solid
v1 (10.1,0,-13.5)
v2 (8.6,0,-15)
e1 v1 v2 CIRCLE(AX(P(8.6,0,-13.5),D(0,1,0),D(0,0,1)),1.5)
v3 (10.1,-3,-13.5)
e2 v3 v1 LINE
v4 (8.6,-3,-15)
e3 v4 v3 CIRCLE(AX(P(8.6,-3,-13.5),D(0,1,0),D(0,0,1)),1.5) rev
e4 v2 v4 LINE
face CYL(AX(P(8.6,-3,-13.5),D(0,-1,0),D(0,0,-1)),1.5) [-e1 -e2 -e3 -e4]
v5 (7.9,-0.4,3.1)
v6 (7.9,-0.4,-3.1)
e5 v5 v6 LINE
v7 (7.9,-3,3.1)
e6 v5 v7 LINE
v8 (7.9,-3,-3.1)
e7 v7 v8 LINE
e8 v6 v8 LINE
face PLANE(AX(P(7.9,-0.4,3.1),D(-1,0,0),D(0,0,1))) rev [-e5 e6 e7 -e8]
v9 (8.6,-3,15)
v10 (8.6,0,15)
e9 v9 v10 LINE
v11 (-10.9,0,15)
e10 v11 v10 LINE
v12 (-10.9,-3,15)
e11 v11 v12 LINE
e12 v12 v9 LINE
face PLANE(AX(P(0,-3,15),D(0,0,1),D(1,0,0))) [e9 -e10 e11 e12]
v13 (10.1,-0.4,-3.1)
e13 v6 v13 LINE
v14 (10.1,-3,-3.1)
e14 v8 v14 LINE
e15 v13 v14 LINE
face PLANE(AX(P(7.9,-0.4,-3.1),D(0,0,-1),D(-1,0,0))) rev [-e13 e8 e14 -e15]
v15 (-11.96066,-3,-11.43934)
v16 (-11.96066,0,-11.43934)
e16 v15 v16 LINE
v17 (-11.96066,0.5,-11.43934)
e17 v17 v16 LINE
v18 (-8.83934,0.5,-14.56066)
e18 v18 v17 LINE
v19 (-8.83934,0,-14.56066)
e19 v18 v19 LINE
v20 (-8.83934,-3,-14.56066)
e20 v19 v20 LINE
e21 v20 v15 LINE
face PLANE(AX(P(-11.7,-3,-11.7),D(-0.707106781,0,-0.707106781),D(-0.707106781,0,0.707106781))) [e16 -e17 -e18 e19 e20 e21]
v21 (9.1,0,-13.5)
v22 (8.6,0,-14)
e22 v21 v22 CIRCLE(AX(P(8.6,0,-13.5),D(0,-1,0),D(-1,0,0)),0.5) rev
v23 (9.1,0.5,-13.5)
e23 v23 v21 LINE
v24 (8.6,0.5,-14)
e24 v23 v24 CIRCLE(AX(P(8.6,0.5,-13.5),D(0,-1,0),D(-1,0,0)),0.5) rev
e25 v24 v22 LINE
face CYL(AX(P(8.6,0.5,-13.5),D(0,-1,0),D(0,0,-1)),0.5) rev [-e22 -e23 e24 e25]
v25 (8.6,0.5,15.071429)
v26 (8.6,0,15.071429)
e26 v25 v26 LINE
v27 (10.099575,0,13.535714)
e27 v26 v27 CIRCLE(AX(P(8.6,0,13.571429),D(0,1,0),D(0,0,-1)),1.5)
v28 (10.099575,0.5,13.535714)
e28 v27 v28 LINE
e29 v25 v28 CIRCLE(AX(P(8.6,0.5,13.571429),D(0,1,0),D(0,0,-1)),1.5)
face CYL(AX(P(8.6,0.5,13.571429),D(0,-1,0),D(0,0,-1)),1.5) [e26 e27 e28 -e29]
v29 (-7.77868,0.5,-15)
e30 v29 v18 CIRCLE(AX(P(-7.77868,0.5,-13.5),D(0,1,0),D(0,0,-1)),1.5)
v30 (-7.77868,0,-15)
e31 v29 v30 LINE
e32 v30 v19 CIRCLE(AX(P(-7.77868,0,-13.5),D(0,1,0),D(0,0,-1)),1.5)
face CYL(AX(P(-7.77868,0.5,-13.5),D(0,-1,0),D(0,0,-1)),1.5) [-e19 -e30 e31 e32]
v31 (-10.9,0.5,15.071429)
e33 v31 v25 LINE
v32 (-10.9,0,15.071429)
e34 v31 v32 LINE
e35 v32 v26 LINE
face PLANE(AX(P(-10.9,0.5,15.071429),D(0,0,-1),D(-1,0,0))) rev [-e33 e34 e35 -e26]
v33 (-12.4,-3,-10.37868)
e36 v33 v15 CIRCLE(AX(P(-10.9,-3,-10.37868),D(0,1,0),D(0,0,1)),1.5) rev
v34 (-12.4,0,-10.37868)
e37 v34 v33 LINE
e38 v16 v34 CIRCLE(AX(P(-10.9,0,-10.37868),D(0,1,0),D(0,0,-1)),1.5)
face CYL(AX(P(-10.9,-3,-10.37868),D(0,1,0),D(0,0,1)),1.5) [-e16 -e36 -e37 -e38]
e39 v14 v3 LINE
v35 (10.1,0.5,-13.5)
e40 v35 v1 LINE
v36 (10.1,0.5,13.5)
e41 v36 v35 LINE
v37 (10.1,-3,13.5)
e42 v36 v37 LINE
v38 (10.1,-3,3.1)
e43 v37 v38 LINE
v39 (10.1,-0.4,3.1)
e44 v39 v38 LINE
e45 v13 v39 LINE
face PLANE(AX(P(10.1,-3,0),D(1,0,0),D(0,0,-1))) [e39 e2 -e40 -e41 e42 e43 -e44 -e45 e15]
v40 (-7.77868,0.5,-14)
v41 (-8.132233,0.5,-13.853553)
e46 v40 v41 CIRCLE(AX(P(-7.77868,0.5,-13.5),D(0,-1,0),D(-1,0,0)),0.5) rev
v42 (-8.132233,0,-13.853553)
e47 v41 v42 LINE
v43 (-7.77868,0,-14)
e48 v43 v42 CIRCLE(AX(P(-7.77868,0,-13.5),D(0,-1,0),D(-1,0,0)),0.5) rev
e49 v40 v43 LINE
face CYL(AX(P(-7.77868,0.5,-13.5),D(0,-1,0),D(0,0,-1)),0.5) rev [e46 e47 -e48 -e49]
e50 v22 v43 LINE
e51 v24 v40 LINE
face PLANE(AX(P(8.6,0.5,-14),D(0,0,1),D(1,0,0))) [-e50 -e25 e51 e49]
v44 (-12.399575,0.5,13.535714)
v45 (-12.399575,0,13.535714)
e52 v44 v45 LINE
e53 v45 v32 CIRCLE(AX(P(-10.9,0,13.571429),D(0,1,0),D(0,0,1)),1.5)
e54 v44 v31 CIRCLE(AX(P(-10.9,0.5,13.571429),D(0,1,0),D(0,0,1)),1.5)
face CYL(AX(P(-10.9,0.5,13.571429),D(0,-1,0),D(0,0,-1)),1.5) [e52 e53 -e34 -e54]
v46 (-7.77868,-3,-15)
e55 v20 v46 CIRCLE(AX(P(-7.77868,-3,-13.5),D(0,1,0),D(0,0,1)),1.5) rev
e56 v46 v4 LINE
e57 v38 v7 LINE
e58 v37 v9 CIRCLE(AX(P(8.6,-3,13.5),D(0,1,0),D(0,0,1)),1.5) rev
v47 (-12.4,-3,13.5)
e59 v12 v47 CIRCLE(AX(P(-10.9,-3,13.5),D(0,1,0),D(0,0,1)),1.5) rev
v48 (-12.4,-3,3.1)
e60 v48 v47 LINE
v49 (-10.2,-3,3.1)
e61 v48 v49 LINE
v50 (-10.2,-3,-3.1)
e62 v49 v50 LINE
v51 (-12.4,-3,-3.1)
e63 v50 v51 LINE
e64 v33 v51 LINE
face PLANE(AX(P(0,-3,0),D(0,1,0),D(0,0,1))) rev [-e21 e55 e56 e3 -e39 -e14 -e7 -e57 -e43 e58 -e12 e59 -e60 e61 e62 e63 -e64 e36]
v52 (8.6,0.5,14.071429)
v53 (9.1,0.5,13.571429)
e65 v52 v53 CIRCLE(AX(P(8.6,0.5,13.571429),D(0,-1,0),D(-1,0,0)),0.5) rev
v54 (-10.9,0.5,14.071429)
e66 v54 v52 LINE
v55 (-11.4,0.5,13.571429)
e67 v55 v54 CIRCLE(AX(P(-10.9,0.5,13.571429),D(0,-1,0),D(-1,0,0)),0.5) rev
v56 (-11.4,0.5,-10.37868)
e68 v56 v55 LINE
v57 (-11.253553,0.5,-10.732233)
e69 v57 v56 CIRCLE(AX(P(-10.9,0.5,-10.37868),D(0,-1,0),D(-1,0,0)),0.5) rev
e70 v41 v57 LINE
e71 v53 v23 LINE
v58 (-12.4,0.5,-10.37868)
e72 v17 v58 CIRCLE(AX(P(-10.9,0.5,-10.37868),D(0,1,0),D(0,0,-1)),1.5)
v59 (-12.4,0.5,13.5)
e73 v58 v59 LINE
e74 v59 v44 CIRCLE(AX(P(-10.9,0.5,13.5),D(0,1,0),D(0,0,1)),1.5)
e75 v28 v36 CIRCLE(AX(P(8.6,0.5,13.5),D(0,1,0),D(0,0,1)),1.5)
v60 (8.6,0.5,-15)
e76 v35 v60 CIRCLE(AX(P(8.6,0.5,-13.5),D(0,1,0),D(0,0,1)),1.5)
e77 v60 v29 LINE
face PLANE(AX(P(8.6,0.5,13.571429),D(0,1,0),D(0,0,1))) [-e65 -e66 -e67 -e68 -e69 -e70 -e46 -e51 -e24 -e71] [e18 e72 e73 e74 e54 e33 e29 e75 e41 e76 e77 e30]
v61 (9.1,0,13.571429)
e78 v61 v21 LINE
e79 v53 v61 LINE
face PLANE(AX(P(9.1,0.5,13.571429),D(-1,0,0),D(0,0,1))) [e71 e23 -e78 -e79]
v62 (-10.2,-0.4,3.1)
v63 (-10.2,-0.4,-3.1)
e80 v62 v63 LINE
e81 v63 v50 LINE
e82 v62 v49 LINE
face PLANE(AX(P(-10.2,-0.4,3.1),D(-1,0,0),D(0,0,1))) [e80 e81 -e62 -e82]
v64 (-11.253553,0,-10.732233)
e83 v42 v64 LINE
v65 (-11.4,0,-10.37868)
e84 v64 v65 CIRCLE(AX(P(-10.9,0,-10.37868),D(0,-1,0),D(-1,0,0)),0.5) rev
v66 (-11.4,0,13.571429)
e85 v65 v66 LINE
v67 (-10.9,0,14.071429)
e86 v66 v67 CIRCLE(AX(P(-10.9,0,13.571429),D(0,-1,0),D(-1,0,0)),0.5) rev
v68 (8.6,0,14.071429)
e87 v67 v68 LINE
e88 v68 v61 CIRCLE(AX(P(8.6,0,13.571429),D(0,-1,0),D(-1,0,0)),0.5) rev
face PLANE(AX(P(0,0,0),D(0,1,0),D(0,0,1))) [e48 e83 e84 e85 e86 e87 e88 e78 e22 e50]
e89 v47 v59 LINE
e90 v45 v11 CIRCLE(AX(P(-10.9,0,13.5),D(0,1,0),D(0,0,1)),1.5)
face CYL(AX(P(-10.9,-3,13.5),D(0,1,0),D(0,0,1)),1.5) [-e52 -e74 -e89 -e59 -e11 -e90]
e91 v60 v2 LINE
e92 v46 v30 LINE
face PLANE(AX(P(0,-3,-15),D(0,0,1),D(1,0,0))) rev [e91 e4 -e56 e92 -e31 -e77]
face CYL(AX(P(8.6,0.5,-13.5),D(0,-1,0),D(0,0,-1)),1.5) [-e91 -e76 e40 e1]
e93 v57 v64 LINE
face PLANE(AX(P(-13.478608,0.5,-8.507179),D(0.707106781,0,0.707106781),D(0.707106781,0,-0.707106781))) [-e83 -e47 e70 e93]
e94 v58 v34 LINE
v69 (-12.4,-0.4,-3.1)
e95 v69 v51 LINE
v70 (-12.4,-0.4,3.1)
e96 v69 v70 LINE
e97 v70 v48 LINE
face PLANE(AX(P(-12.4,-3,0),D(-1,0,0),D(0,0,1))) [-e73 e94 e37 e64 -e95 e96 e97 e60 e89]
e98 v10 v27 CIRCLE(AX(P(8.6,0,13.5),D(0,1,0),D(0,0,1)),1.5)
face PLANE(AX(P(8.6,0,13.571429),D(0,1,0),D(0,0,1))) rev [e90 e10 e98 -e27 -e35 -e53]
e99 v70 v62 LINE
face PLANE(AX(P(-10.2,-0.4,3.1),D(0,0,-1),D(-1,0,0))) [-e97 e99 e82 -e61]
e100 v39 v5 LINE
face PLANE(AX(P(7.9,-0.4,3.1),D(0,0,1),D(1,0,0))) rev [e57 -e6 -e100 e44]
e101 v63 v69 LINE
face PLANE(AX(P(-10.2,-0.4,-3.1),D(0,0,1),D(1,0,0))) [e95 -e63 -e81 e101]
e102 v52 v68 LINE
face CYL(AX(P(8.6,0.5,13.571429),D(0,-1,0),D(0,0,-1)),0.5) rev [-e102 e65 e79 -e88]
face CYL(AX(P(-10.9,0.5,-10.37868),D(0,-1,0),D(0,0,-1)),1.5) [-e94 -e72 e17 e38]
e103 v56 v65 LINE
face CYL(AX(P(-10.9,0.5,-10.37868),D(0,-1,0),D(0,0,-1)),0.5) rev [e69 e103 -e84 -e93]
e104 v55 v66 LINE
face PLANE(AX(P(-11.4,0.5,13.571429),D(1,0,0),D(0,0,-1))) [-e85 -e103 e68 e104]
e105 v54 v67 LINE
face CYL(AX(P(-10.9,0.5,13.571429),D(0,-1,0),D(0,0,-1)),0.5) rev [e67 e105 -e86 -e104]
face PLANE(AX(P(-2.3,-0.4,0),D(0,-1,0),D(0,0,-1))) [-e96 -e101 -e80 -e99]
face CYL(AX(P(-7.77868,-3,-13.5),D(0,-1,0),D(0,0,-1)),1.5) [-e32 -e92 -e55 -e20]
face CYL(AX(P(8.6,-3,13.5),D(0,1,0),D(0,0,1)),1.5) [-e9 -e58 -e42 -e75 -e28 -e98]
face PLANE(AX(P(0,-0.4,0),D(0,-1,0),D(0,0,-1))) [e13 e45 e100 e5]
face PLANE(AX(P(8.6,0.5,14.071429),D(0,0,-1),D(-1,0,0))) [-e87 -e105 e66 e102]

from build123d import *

# Parameters (mm, degrees)
BODY_DEPTH             = 3
MAGNET_CUTOUT_SKETCH_W = 2.2
MAGNET_CUTOUT_SKETCH_H = 6.2
MAGNET_CUTOUT_DEPTH    = 2.6
BORDER_DEPTH           = 0.5
FILLET_1_R             = 1.5


with BuildPart() as part:
    # surface_sketch → body (new body)
    with BuildSketch(Plane(origin=(0, 0, 0), x_dir=(1, 0, 0), z_dir=(0, 1, 0))):
        Polygon((-12.4, -15), (10.1, -15), (10.1, 15), (-8.4, 15), (-12.4, 11), align=None)
    extrude(amount=-BODY_DEPTH)

    # magnet_cutout_sketch → magnet_cutout (cut)
    with BuildSketch(Plane.XZ.offset(3)):
        with Locations((9, 0)):
            Rectangle(MAGNET_CUTOUT_SKETCH_W, MAGNET_CUTOUT_SKETCH_H)
    magnet_cutout = extrude(amount=-MAGNET_CUTOUT_DEPTH, mode=Mode.SUBTRACT)

    # magnet_cutout_mirror: magnet_cutout across plane
    add(magnet_cutout.mirror(Plane(origin=(-1.15, 0, 0), x_dir=(0, 0, 1), z_dir=(1, 0, 0))), mode=Mode.SUBTRACT)

    # border_sketch → border (add)
    with BuildSketch(Plane(origin=(0, 0, 0), x_dir=(1, 0, 0), z_dir=(0, 1, 0))):
        with BuildLine():
            Line((-7.778679656, 15), (8.6, 15))
            ThreePointArc((8.6, 15), (9.660660172, 14.560660172), (10.1, 13.5))
            Line((10.1, 13.5), (10.1, -13.571428571))
            ThreePointArc((10.1, -13.571428571), (9.660660172, -14.632088743), (8.6, -15.071428571))
            Line((8.6, -15.071428571), (-10.9, -15.071428571))
            ThreePointArc((-10.9, -15.071428571), (-11.960660172, -14.632088743), (-12.4, -13.571428571))
            Line((-12.4, -13.571428571), (-12.4, 10.378679656))
            ThreePointArc((-12.4, 10.378679656), (-12.285819299, 10.952704805), (-11.960660172, 11.439339828))
            Line((-11.960660172, 11.439339828), (-8.839339828, 14.560660172))
            ThreePointArc((-8.839339828, 14.560660172), (-8.352704805, 14.885819299), (-7.778679656, 15))
        make_face()
        with BuildLine():
            Line((-7.778679656, 14), (8.6, 14))
            ThreePointArc((8.6, 14), (8.953553391, 13.853553391), (9.1, 13.5))
            Line((9.1, 13.5), (9.1, -13.571428571))
            ThreePointArc((9.1, -13.571428571), (8.953553391, -13.924981962), (8.6, -14.071428571))
            Line((8.6, -14.071428571), (-10.9, -14.071428571))
            ThreePointArc((-10.9, -14.071428571), (-11.253553391, -13.924981962), (-11.4, -13.571428571))
            Line((-11.4, -13.571428571), (-11.4, 10.378679656))
            ThreePointArc((-11.4, 10.378679656), (-11.361939766, 10.570021373), (-11.253553391, 10.732233047))
            Line((-11.253553391, 10.732233047), (-8.132233047, 13.853553391))
            ThreePointArc((-8.132233047, 13.853553391), (-7.970021373, 13.961939766), (-7.778679656, 14))
        make_face(mode=Mode.SUBTRACT)
    extrude(amount=BORDER_DEPTH)

    # Скругление1
    # the kernel refuses this fillet: 1.5 mm, written as the material it takes off along each edge
    with BuildSketch(Plane(origin=(10.1, 3.75, 15), x_dir=(-1, 0, 0), z_dir=(0, -1, 0))) as fillet_1_piece_1_section:
        with BuildLine():
            CenterArc((FILLET_1_R, FILLET_1_R), FILLET_1_R, 180, 90)
            Line((0, FILLET_1_R), (0, 0))
            Line((0, 0), (FILLET_1_R, 0))
        make_face()
    fillet_1_piece_1 = extrude(amount=10.5, mode=Mode.PRIVATE)
    fillet_1_piece_1 = fillet_1_piece_1 - Plane(origin=(8.6, 0.25, 13.571428571), x_dir=(1, 0, 0), z_dir=(0, -1, 0)) * Cylinder(1.5, 27, mode=Mode.PRIVATE)
    add(fillet_1_piece_1, mode=Mode.SUBTRACT)
    with BuildSketch(Plane(origin=(10.1, 0, 15), x_dir=(-1, 0, 0), z_dir=(0, -1, 0))) as fillet_1_piece_2:
        with BuildLine():
            CenterArc((FILLET_1_R, FILLET_1_R), FILLET_1_R, 180, 90)
            Line((0, FILLET_1_R), (0, 0))
            Line((0, 0), (FILLET_1_R, 0))
        make_face()
    extrude(amount=6.75, mode=Mode.SUBTRACT)
    with BuildSketch(Plane(origin=(10.1, 3.75, -15), x_dir=(0, 0, 1), z_dir=(0, -1, 0))) as fillet_1_piece_3:
        with BuildLine():
            CenterArc((FILLET_1_R, FILLET_1_R), FILLET_1_R, 180, 90)
            Line((0, FILLET_1_R), (0, 0))
            Line((0, 0), (FILLET_1_R, 0))
        make_face()
    extrude(amount=10.5, mode=Mode.SUBTRACT)
    with BuildSketch(Plane(origin=(-12.4, 3.75, 15), x_dir=(1, 0, 0), z_dir=(0, -1, 0))) as fillet_1_piece_4_section:
        with BuildLine():
            CenterArc((FILLET_1_R, -FILLET_1_R), FILLET_1_R, 90, 90)
            Line((0, -FILLET_1_R), (0, 0))
            Line((0, 0), (FILLET_1_R, 0))
        make_face()
    fillet_1_piece_4 = extrude(amount=10.5, mode=Mode.PRIVATE)
    fillet_1_piece_4 = fillet_1_piece_4 - Plane(origin=(-10.9, 0.25, 13.571428571), x_dir=(0, 0, 1), z_dir=(0, -1, 0)) * Cylinder(1.5, 27, mode=Mode.PRIVATE)
    add(fillet_1_piece_4, mode=Mode.SUBTRACT)
    with BuildSketch(Plane(origin=(-12.4, 0, 15), x_dir=(1, 0, 0), z_dir=(0, -1, 0))) as fillet_1_piece_5:
        with BuildLine():
            CenterArc((FILLET_1_R, -FILLET_1_R), FILLET_1_R, 90, 90)
            Line((0, -FILLET_1_R), (0, 0))
            Line((0, 0), (FILLET_1_R, 0))
        make_face()
    extrude(amount=6.75, mode=Mode.SUBTRACT)
    with BuildSketch(Plane(origin=(-8.4, 1.553300859, -15), x_dir=(-0.7071067811865476, 0, 0.7071067811865476), z_dir=(0, -1, 0)), Plane(origin=(-12.4, 1.553300859, -11), x_dir=(0, 0, 1), z_dir=(0, -1, 0))) as fillet_1_piece_6:
        with BuildLine():
            CenterArc((FILLET_1_R * 0.414213562373, -FILLET_1_R), FILLET_1_R, 90, 45)
            Line((-FILLET_1_R * 0.292893218813, -FILLET_1_R * 0.292893218813), (0, 0))
            Line((0, 0), (FILLET_1_R * 0.414213562373, 0))
        make_face()
    extrude(amount=6.106601718, mode=Mode.SUBTRACT)


solid = part.part
